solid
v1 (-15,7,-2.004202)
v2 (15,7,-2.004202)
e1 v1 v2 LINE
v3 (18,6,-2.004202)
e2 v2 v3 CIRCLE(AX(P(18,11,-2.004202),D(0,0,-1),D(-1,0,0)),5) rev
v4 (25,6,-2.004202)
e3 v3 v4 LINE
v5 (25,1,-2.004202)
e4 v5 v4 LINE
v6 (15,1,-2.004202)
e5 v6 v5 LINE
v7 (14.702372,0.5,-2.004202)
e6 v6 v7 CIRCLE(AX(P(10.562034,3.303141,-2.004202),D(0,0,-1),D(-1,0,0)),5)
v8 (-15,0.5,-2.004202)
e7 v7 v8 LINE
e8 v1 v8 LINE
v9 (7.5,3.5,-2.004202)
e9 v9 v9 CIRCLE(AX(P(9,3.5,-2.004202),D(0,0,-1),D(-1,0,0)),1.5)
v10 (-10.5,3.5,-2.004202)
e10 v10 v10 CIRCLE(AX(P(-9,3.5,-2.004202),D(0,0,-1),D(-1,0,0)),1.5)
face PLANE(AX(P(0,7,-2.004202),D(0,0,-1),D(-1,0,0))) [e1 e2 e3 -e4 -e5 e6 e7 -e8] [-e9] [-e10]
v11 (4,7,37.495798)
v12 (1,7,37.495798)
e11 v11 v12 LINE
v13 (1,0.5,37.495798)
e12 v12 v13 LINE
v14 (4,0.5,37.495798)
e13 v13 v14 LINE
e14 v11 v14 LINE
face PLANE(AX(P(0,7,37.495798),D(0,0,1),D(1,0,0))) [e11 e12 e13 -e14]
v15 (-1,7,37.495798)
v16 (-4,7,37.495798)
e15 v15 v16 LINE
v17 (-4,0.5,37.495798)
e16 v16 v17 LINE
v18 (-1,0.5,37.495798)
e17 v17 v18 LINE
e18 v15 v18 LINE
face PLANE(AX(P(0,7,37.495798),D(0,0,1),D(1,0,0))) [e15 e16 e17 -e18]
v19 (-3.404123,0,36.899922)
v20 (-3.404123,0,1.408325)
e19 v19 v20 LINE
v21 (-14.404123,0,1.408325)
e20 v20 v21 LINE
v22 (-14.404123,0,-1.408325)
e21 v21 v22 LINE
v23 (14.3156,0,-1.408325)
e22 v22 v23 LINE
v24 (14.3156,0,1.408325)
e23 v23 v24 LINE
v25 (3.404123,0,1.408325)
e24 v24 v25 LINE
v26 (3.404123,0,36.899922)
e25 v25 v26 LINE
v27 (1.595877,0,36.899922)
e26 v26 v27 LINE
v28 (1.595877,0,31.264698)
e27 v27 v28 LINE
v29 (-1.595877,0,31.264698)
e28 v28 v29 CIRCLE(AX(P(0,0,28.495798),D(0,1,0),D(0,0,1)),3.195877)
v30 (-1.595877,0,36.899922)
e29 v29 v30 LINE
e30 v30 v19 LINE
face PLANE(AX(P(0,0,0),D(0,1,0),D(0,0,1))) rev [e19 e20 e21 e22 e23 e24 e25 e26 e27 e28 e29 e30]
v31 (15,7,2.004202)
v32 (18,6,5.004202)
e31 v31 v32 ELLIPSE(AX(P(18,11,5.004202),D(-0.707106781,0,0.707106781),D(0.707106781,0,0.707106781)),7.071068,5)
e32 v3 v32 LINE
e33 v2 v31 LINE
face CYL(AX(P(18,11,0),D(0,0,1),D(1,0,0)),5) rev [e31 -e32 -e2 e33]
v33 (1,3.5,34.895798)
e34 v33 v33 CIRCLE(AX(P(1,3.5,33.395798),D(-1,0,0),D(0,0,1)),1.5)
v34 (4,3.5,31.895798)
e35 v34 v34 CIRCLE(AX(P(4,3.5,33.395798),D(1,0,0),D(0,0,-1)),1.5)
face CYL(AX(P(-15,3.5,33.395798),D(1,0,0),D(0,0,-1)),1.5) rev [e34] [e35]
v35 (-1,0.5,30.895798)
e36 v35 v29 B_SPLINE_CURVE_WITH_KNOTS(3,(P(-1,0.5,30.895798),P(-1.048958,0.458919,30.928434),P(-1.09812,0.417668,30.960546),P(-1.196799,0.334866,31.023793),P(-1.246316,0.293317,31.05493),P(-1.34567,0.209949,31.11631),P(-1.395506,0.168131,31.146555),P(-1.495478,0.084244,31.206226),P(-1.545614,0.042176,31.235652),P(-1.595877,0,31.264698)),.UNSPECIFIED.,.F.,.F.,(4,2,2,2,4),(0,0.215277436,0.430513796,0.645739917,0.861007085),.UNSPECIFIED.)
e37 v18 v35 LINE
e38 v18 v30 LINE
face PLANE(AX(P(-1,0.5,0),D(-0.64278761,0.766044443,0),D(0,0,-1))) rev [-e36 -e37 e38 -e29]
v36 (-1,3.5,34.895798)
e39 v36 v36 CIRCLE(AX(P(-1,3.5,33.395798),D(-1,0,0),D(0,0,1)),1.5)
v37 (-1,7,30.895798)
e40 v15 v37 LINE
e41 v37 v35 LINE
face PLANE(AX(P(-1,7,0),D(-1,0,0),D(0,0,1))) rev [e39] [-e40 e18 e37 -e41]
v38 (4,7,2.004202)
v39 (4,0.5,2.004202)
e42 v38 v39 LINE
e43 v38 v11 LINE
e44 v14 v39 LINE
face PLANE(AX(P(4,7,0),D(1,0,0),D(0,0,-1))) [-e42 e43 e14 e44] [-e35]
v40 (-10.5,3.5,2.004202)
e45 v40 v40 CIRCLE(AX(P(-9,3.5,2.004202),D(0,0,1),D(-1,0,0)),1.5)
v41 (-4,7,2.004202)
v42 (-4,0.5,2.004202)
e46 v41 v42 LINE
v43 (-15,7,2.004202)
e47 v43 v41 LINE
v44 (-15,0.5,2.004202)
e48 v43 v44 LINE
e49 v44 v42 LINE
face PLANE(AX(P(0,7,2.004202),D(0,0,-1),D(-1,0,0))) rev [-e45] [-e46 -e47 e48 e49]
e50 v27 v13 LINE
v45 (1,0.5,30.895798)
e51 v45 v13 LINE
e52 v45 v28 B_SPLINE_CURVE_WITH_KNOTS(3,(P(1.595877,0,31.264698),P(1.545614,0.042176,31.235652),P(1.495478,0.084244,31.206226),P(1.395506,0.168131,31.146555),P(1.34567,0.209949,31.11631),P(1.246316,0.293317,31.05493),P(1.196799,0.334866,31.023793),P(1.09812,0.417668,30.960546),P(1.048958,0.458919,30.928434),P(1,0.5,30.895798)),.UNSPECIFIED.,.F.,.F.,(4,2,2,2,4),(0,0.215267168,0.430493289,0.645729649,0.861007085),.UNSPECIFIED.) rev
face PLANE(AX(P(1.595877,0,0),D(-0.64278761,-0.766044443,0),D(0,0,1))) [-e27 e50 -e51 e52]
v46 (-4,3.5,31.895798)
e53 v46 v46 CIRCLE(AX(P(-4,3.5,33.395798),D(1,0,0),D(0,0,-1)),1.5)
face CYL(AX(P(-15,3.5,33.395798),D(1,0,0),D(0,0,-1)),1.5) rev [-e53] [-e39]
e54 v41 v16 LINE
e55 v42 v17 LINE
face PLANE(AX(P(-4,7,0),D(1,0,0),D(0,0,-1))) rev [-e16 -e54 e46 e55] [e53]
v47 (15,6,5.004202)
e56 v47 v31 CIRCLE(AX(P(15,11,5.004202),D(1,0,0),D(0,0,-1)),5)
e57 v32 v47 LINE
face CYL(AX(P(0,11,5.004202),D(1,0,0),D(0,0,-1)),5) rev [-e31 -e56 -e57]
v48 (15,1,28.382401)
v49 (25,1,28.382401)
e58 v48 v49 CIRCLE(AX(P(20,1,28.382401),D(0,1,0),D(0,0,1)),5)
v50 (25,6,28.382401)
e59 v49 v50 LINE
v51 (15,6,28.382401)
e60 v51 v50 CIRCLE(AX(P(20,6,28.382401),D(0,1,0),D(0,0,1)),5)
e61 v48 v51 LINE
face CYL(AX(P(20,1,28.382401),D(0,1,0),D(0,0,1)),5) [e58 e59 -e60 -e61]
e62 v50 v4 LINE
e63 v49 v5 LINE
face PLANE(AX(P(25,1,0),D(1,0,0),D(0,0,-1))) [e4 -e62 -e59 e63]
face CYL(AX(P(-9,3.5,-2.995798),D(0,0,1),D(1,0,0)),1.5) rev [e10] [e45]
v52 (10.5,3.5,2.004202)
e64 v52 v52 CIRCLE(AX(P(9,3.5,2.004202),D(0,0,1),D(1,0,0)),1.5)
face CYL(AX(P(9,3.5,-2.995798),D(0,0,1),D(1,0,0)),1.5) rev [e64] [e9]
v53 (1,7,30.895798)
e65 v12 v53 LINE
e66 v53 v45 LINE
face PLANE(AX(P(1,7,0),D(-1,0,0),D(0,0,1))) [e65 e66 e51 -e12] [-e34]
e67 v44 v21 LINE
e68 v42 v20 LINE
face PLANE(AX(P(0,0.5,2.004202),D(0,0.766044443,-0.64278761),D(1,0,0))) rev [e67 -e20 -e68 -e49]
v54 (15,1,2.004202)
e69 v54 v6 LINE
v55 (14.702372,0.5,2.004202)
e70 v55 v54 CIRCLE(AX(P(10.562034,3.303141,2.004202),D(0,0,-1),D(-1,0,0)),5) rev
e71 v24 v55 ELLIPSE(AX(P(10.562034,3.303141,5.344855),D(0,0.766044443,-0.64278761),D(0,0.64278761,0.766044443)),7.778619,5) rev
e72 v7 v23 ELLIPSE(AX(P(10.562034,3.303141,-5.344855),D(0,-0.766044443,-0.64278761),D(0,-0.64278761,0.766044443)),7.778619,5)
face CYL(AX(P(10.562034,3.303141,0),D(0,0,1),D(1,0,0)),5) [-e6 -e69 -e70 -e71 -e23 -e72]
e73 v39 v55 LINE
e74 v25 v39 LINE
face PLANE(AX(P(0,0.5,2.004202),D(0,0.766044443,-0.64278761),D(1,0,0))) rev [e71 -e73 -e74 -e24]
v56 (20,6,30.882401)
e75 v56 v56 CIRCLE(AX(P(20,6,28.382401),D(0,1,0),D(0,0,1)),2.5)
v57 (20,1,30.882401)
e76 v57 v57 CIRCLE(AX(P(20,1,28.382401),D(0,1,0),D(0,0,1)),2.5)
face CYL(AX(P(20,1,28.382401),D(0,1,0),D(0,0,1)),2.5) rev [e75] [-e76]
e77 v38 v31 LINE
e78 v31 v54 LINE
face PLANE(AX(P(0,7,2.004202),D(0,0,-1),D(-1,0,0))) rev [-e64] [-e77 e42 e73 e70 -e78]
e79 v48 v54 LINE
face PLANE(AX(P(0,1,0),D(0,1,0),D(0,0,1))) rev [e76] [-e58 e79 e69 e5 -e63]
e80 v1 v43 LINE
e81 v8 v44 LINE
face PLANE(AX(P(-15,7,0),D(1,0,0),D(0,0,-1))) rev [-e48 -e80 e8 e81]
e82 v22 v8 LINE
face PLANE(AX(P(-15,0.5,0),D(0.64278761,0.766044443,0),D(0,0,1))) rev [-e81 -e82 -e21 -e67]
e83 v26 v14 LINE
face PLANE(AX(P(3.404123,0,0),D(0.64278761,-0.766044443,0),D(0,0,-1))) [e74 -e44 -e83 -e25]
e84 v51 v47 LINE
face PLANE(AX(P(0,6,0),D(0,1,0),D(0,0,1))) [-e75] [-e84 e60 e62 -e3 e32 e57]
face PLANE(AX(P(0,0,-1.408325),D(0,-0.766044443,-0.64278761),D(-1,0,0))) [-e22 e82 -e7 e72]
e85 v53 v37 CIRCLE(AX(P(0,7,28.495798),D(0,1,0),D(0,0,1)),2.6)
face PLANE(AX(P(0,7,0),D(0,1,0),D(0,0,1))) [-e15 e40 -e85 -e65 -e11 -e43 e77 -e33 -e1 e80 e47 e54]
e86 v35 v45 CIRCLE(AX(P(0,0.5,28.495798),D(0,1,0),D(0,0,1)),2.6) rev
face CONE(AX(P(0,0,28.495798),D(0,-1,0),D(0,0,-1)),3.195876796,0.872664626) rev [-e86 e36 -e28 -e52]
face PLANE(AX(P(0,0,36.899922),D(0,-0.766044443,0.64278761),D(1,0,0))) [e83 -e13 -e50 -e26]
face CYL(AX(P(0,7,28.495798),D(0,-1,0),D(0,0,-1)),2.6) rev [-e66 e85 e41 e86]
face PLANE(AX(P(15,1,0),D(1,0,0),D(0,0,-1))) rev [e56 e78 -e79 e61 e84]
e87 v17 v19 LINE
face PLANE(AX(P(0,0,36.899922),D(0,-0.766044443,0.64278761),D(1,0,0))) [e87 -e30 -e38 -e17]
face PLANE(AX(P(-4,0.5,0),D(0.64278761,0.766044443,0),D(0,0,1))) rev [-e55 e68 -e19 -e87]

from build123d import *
from OCP.BRepFilletAPI import BRepFilletAPI_MakeChamfer

# Parameters (mm, degrees)
BOSS_EXTRUDE1_DEPTH      = 7
SKETCH2_R                = 1.5
CUT_EXTRUDE1_DEPTH       = 43.613787576
SKETCH3_R                = 1.5
CUT_EXTRUDE2_DEPTH       = 5
CHAMFER1_SIZE            = 0.5
CHAMFER1_SIZE2           = 0.595876796
BOSS_EXTRUDE2_DEPTH      = 2.5
BOSS_EXTRUDE2_DEPTH_BACK = 2.5
FILLET1_R                = 5
FILLET2_START            = -2.004201681
FILLET2_DEPTH            = 7.008403362
FILLET2_START_2          = 15
FILLET2_2_DEPTH          = 3


with BuildPart() as part:
    # Sketch1 → Boss-Extrude1 (new body)
    with BuildSketch(Plane(origin=(0, 0, 0), x_dir=(1, 0, 0), z_dir=(0, 1, 0))):
        with BuildLine():
            Line((15, 2.004201681), (-15, 2.004201681))
            Line((-15, 2.004201681), (-15, -2.004201681))
            Line((-15, -2.004201681), (-4, -2.004201681))
            Line((-4, -2.004201681), (-4, -37.495798319))
            Line((-4, -37.495798319), (-1, -37.495798319))
            Line((-1, -37.495798319), (-1, -30.895798319))
            ThreePointArc((-1, -30.895798319), (0, -25.895798319), (1, -30.895798319))
            Line((1, -30.895798319), (1, -37.495798319))
            Line((1, -37.495798319), (4, -37.495798319))
            Line((4, -37.495798319), (4, -2.004201681))
            Line((4, -2.004201681), (15, -2.004201681))
            Line((15, -2.004201681), (15, 2.004201681))
        make_face()
    extrude(amount=BOSS_EXTRUDE1_DEPTH)

    # Sketch2 → Cut-Extrude1 (cut, through all)
    with BuildSketch(Plane(origin=(4, 0, 0), x_dir=(0, 0, -1), z_dir=(1, 0, 0))):
        with Locations((-33.395798319, 3.5)):
            Circle(SKETCH2_R)
    extrude(amount=-CUT_EXTRUDE1_DEPTH, mode=Mode.SUBTRACT)

    # Sketch3 → Cut-Extrude2 (cut)
    with BuildSketch(Plane.XY.offset(2.004201681)):
        with Locations((9, 3.5)):
            Circle(SKETCH3_R)
        with Locations(Location((-9, 3.5, 0), (0, 0, 180))):
            Circle(SKETCH3_R)
    extrude(amount=-CUT_EXTRUDE2_DEPTH, mode=Mode.SUBTRACT)

    # Chamfer1: one chamfer whose edges measure the first distance from different faces: ONE call of the kernel's chamfer builder (chamfer() names one face for all edges)
    chamfer1_edges_1 = [part.edges().sort_by_distance(p)[0] for p in [
        (-1, 0, 34.195798319),
    ]]
    chamfer1_side_1 = [part.faces().sort_by_distance(p)[0] for p in [
        (-1, 3.5, 37.399590212),
    ]]
    chamfer1_edges_2 = [part.edges().sort_by_distance(p)[0] for p in [
        (-2.5, 0, 37.495798319),
    ]]
    chamfer1_side_2 = [part.faces().sort_by_distance(p)[0] for p in [
        (-2.5, 3.5, 37.495798319),
    ]]
    chamfer1_edges_3 = [part.edges().sort_by_distance(p)[0] for p in [
        (-4, 0, 19.75),
    ]]
    chamfer1_side_3 = [part.faces().sort_by_distance(p)[0] for p in [
        (-4, 3.5, 19.350383526),
    ]]
    chamfer1_edges_4 = [part.edges().sort_by_distance(p)[0] for p in [
        (-9.5, 0, 2.004201681),
    ]]
    chamfer1_side_4 = [part.faces().sort_by_distance(p)[0] for p in [
        (-14.869615952, 3.5, 2.004201681),
    ]]
    chamfer1_edges_5 = [part.edges().sort_by_distance(p)[0] for p in [
        (-15, 0, 0),
    ]]
    chamfer1_side_5 = [part.faces().sort_by_distance(p)[0] for p in [
        (-15, 3.5, 0),
    ]]
    chamfer1_edges_6 = [part.edges().sort_by_distance(p)[0] for p in [
        (0, 0, -2.004201681),
    ]]
    chamfer1_side_6 = [part.faces().sort_by_distance(p)[0] for p in [
        (0, 3.5, -2.004201681),
    ]]
    chamfer1_edges_7 = [part.edges().sort_by_distance(p)[0] for p in [
        (15, 0, 0),
    ]]
    chamfer1_side_7 = [part.faces().sort_by_distance(p)[0] for p in [
        (15, 3.5, 0),
    ]]
    chamfer1_edges_8 = [part.edges().sort_by_distance(p)[0] for p in [
        (9.5, 0, 2.004201681),
    ]]
    chamfer1_side_8 = [part.faces().sort_by_distance(p)[0] for p in [
        (4.130384048, 3.5, 2.004201681),
    ]]
    chamfer1_edges_9 = [part.edges().sort_by_distance(p)[0] for p in [
        (4, 0, 19.75),
    ]]
    chamfer1_side_9 = [part.faces().sort_by_distance(p)[0] for p in [
        (4, 3.5, 19.350383526),
    ]]
    chamfer1_edges_10 = [part.edges().sort_by_distance(p)[0] for p in [
        (2.5, 0, 37.495798319),
    ]]
    chamfer1_side_10 = [part.faces().sort_by_distance(p)[0] for p in [
        (2.5, 3.5, 37.495798319),
    ]]
    chamfer1_edges_11 = [part.edges().sort_by_distance(p)[0] for p in [
        (1, 0, 34.195798319),
    ]]
    chamfer1_side_11 = [part.faces().sort_by_distance(p)[0] for p in [
        (1, 3.5, 30.992006427),
    ]]
    chamfer1_edges_12 = [part.edges().sort_by_distance(p)[0] for p in [
        (0, 0, 25.895798319),
    ]]
    chamfer1_side_12 = [part.faces().sort_by_distance(p)[0] for p in [
        (0, 3.5, 25.895798319),
    ]]
    chamfer1 = BRepFilletAPI_MakeChamfer(part.part.solid().wrapped)
    for e in chamfer1_edges_1:
        chamfer1.Add(CHAMFER1_SIZE, CHAMFER1_SIZE2, e.wrapped, chamfer1_side_1[0].wrapped)  # the first distance lies on this face
    for e in chamfer1_edges_2:
        chamfer1.Add(CHAMFER1_SIZE, CHAMFER1_SIZE2, e.wrapped, chamfer1_side_2[0].wrapped)  # the first distance lies on this face
    for e in chamfer1_edges_3:
        chamfer1.Add(CHAMFER1_SIZE, CHAMFER1_SIZE2, e.wrapped, chamfer1_side_3[0].wrapped)  # the first distance lies on this face
    for e in chamfer1_edges_4:
        chamfer1.Add(CHAMFER1_SIZE, CHAMFER1_SIZE2, e.wrapped, chamfer1_side_4[0].wrapped)  # the first distance lies on this face
    for e in chamfer1_edges_5:
        chamfer1.Add(CHAMFER1_SIZE, CHAMFER1_SIZE2, e.wrapped, chamfer1_side_5[0].wrapped)  # the first distance lies on this face
    for e in chamfer1_edges_6:
        chamfer1.Add(CHAMFER1_SIZE, CHAMFER1_SIZE2, e.wrapped, chamfer1_side_6[0].wrapped)  # the first distance lies on this face
    for e in chamfer1_edges_7:
        chamfer1.Add(CHAMFER1_SIZE, CHAMFER1_SIZE2, e.wrapped, chamfer1_side_7[0].wrapped)  # the first distance lies on this face
    for e in chamfer1_edges_8:
        chamfer1.Add(CHAMFER1_SIZE, CHAMFER1_SIZE2, e.wrapped, chamfer1_side_8[0].wrapped)  # the first distance lies on this face
    for e in chamfer1_edges_9:
        chamfer1.Add(CHAMFER1_SIZE, CHAMFER1_SIZE2, e.wrapped, chamfer1_side_9[0].wrapped)  # the first distance lies on this face
    for e in chamfer1_edges_10:
        chamfer1.Add(CHAMFER1_SIZE, CHAMFER1_SIZE2, e.wrapped, chamfer1_side_10[0].wrapped)  # the first distance lies on this face
    for e in chamfer1_edges_11:
        chamfer1.Add(CHAMFER1_SIZE, CHAMFER1_SIZE2, e.wrapped, chamfer1_side_11[0].wrapped)  # the first distance lies on this face
    for e in chamfer1_edges_12:
        chamfer1.Add(CHAMFER1_SIZE, CHAMFER1_SIZE2, e.wrapped, chamfer1_side_12[0].wrapped)  # the first distance lies on this face
    add(Compound.cast(chamfer1.Shape()), mode=Mode.REPLACE)

    # Sketch4 → Boss-Extrude2 (add, two sides: drawn at the far end of the back side and taken through both)
    with BuildSketch(Plane(origin=(0, 3.5, 0), x_dir=(1, 0, 0), z_dir=(0, 1, 0)).offset(-BOSS_EXTRUDE2_DEPTH_BACK)):
        with BuildLine():
            Line((20, -23.382400921), (20, 2.004201681))
            Line((20, 2.004201681), (15, 2.004201681))
            Line((15, 2.004201681), (15, -28.382400921))
            ThreePointArc((15, -28.382400921), (16.464466094, -24.846867015), (20, -23.382400921))
        make_face()
        with BuildLine():
            Line((25, 2.004201681), (20, 2.004201681))
            Line((20, 2.004201681), (20, -23.382400921))
            ThreePointArc((20, -23.382400921), (23.535533906, -24.846867015), (25, -28.382400921))
            Line((25, -28.382400921), (25, 2.004201681))
        make_face()
        with BuildLine():
            ThreePointArc((25, -28.382400921), (23.535533906, -24.846867015), (20, -23.382400921))
            Line((20, -23.382400921), (20, -25.882400921))
            ThreePointArc((20, -25.882400921), (21.767766953, -26.614633968), (22.5, -28.382400921))
            ThreePointArc((22.5, -28.382400921), (21.767766953, -30.150167874), (20, -30.882400921))
            Line((20, -30.882400921), (20, -33.382400921))
            ThreePointArc((20, -33.382400921), (23.535533906, -31.917934827), (25, -28.382400921))
        make_face()
        with BuildLine():
            Line((20, -25.882400921), (20, -23.382400921))
            ThreePointArc((20, -23.382400921), (16.464466094, -24.846867015), (15, -28.382400921))
            ThreePointArc((15, -28.382400921), (16.464466094, -31.917934827), (20, -33.382400921))
            Line((20, -33.382400921), (20, -30.882400921))
            ThreePointArc((20, -30.882400921), (17.5, -28.382400921), (20, -25.882400921))
        make_face()
    extrude(amount=BOSS_EXTRUDE2_DEPTH + BOSS_EXTRUDE2_DEPTH_BACK)

    # Fillet1
    # the kernel refuses this fillet: 5 mm, written as the material it adds along each edge
    with BuildSketch(Plane(origin=(15, 6, -2.004201681), x_dir=(0, 1, 0), z_dir=(0, 0, 1))) as fillet1_piece_1:
        with BuildLine():
            CenterArc((5, -3), FILLET1_R, 143.130102354, 36.869897646)
            Line((0, -3), (0, 0))
            Line((0, 0), (1, 0))
        make_face()
    extrude(amount=4.008403361)
    # the kernel refuses this fillet: 5 mm, written as the material it takes off along each edge
    with BuildSketch(Plane(origin=(15, 0.5, 5.998839323), x_dir=(-0.7660444431189789, -0.6427876096865383, 0), z_dir=(0, 0, -1))) as fillet1_2_piece_1:
        with BuildLine():
            CenterArc((1.597855057, 5), FILLET1_R, 247.427648729, 22.572351271)
            Line((-0.321393805, 0.383022222), (0, 0))
            Line((0, 0), (1.597855057, 0))
        make_face()
    extrude(amount=11.997678646, mode=Mode.SUBTRACT)

    # Fillet2: read off the stored shape, not the designer's step
    # Fillet2 outline → Fillet2 (add)
    with BuildSketch(Plane.XY.offset(FILLET2_START)):
        with BuildLine():
            ThreePointArc((18, 6), (16.41886117, 6.25658351), (15, 7))
            Line((15, 7), (15, 6))
            Line((15, 6), (18, 6))
        make_face()
    extrude(amount=FILLET2_DEPTH)

    # Fillet2 2 outline → Fillet2 2 (cut)
    with BuildSketch(Plane.YZ.offset(FILLET2_START_2)):
        with BuildLine():
            Line((9, 5.004201681), (6, 5.004201681))
            ThreePointArc((6, 5.004201681), (6.25658351, 3.423062851), (7, 2.004201681))
            Line((7, 2.004201681), (7.75315126, 1))
            Line((7.75315126, 1), (9, 1))
            Line((9, 1), (9, 5.004201681))
        make_face()
    extrude(amount=FILLET2_2_DEPTH, mode=Mode.SUBTRACT)


solid = part.part
